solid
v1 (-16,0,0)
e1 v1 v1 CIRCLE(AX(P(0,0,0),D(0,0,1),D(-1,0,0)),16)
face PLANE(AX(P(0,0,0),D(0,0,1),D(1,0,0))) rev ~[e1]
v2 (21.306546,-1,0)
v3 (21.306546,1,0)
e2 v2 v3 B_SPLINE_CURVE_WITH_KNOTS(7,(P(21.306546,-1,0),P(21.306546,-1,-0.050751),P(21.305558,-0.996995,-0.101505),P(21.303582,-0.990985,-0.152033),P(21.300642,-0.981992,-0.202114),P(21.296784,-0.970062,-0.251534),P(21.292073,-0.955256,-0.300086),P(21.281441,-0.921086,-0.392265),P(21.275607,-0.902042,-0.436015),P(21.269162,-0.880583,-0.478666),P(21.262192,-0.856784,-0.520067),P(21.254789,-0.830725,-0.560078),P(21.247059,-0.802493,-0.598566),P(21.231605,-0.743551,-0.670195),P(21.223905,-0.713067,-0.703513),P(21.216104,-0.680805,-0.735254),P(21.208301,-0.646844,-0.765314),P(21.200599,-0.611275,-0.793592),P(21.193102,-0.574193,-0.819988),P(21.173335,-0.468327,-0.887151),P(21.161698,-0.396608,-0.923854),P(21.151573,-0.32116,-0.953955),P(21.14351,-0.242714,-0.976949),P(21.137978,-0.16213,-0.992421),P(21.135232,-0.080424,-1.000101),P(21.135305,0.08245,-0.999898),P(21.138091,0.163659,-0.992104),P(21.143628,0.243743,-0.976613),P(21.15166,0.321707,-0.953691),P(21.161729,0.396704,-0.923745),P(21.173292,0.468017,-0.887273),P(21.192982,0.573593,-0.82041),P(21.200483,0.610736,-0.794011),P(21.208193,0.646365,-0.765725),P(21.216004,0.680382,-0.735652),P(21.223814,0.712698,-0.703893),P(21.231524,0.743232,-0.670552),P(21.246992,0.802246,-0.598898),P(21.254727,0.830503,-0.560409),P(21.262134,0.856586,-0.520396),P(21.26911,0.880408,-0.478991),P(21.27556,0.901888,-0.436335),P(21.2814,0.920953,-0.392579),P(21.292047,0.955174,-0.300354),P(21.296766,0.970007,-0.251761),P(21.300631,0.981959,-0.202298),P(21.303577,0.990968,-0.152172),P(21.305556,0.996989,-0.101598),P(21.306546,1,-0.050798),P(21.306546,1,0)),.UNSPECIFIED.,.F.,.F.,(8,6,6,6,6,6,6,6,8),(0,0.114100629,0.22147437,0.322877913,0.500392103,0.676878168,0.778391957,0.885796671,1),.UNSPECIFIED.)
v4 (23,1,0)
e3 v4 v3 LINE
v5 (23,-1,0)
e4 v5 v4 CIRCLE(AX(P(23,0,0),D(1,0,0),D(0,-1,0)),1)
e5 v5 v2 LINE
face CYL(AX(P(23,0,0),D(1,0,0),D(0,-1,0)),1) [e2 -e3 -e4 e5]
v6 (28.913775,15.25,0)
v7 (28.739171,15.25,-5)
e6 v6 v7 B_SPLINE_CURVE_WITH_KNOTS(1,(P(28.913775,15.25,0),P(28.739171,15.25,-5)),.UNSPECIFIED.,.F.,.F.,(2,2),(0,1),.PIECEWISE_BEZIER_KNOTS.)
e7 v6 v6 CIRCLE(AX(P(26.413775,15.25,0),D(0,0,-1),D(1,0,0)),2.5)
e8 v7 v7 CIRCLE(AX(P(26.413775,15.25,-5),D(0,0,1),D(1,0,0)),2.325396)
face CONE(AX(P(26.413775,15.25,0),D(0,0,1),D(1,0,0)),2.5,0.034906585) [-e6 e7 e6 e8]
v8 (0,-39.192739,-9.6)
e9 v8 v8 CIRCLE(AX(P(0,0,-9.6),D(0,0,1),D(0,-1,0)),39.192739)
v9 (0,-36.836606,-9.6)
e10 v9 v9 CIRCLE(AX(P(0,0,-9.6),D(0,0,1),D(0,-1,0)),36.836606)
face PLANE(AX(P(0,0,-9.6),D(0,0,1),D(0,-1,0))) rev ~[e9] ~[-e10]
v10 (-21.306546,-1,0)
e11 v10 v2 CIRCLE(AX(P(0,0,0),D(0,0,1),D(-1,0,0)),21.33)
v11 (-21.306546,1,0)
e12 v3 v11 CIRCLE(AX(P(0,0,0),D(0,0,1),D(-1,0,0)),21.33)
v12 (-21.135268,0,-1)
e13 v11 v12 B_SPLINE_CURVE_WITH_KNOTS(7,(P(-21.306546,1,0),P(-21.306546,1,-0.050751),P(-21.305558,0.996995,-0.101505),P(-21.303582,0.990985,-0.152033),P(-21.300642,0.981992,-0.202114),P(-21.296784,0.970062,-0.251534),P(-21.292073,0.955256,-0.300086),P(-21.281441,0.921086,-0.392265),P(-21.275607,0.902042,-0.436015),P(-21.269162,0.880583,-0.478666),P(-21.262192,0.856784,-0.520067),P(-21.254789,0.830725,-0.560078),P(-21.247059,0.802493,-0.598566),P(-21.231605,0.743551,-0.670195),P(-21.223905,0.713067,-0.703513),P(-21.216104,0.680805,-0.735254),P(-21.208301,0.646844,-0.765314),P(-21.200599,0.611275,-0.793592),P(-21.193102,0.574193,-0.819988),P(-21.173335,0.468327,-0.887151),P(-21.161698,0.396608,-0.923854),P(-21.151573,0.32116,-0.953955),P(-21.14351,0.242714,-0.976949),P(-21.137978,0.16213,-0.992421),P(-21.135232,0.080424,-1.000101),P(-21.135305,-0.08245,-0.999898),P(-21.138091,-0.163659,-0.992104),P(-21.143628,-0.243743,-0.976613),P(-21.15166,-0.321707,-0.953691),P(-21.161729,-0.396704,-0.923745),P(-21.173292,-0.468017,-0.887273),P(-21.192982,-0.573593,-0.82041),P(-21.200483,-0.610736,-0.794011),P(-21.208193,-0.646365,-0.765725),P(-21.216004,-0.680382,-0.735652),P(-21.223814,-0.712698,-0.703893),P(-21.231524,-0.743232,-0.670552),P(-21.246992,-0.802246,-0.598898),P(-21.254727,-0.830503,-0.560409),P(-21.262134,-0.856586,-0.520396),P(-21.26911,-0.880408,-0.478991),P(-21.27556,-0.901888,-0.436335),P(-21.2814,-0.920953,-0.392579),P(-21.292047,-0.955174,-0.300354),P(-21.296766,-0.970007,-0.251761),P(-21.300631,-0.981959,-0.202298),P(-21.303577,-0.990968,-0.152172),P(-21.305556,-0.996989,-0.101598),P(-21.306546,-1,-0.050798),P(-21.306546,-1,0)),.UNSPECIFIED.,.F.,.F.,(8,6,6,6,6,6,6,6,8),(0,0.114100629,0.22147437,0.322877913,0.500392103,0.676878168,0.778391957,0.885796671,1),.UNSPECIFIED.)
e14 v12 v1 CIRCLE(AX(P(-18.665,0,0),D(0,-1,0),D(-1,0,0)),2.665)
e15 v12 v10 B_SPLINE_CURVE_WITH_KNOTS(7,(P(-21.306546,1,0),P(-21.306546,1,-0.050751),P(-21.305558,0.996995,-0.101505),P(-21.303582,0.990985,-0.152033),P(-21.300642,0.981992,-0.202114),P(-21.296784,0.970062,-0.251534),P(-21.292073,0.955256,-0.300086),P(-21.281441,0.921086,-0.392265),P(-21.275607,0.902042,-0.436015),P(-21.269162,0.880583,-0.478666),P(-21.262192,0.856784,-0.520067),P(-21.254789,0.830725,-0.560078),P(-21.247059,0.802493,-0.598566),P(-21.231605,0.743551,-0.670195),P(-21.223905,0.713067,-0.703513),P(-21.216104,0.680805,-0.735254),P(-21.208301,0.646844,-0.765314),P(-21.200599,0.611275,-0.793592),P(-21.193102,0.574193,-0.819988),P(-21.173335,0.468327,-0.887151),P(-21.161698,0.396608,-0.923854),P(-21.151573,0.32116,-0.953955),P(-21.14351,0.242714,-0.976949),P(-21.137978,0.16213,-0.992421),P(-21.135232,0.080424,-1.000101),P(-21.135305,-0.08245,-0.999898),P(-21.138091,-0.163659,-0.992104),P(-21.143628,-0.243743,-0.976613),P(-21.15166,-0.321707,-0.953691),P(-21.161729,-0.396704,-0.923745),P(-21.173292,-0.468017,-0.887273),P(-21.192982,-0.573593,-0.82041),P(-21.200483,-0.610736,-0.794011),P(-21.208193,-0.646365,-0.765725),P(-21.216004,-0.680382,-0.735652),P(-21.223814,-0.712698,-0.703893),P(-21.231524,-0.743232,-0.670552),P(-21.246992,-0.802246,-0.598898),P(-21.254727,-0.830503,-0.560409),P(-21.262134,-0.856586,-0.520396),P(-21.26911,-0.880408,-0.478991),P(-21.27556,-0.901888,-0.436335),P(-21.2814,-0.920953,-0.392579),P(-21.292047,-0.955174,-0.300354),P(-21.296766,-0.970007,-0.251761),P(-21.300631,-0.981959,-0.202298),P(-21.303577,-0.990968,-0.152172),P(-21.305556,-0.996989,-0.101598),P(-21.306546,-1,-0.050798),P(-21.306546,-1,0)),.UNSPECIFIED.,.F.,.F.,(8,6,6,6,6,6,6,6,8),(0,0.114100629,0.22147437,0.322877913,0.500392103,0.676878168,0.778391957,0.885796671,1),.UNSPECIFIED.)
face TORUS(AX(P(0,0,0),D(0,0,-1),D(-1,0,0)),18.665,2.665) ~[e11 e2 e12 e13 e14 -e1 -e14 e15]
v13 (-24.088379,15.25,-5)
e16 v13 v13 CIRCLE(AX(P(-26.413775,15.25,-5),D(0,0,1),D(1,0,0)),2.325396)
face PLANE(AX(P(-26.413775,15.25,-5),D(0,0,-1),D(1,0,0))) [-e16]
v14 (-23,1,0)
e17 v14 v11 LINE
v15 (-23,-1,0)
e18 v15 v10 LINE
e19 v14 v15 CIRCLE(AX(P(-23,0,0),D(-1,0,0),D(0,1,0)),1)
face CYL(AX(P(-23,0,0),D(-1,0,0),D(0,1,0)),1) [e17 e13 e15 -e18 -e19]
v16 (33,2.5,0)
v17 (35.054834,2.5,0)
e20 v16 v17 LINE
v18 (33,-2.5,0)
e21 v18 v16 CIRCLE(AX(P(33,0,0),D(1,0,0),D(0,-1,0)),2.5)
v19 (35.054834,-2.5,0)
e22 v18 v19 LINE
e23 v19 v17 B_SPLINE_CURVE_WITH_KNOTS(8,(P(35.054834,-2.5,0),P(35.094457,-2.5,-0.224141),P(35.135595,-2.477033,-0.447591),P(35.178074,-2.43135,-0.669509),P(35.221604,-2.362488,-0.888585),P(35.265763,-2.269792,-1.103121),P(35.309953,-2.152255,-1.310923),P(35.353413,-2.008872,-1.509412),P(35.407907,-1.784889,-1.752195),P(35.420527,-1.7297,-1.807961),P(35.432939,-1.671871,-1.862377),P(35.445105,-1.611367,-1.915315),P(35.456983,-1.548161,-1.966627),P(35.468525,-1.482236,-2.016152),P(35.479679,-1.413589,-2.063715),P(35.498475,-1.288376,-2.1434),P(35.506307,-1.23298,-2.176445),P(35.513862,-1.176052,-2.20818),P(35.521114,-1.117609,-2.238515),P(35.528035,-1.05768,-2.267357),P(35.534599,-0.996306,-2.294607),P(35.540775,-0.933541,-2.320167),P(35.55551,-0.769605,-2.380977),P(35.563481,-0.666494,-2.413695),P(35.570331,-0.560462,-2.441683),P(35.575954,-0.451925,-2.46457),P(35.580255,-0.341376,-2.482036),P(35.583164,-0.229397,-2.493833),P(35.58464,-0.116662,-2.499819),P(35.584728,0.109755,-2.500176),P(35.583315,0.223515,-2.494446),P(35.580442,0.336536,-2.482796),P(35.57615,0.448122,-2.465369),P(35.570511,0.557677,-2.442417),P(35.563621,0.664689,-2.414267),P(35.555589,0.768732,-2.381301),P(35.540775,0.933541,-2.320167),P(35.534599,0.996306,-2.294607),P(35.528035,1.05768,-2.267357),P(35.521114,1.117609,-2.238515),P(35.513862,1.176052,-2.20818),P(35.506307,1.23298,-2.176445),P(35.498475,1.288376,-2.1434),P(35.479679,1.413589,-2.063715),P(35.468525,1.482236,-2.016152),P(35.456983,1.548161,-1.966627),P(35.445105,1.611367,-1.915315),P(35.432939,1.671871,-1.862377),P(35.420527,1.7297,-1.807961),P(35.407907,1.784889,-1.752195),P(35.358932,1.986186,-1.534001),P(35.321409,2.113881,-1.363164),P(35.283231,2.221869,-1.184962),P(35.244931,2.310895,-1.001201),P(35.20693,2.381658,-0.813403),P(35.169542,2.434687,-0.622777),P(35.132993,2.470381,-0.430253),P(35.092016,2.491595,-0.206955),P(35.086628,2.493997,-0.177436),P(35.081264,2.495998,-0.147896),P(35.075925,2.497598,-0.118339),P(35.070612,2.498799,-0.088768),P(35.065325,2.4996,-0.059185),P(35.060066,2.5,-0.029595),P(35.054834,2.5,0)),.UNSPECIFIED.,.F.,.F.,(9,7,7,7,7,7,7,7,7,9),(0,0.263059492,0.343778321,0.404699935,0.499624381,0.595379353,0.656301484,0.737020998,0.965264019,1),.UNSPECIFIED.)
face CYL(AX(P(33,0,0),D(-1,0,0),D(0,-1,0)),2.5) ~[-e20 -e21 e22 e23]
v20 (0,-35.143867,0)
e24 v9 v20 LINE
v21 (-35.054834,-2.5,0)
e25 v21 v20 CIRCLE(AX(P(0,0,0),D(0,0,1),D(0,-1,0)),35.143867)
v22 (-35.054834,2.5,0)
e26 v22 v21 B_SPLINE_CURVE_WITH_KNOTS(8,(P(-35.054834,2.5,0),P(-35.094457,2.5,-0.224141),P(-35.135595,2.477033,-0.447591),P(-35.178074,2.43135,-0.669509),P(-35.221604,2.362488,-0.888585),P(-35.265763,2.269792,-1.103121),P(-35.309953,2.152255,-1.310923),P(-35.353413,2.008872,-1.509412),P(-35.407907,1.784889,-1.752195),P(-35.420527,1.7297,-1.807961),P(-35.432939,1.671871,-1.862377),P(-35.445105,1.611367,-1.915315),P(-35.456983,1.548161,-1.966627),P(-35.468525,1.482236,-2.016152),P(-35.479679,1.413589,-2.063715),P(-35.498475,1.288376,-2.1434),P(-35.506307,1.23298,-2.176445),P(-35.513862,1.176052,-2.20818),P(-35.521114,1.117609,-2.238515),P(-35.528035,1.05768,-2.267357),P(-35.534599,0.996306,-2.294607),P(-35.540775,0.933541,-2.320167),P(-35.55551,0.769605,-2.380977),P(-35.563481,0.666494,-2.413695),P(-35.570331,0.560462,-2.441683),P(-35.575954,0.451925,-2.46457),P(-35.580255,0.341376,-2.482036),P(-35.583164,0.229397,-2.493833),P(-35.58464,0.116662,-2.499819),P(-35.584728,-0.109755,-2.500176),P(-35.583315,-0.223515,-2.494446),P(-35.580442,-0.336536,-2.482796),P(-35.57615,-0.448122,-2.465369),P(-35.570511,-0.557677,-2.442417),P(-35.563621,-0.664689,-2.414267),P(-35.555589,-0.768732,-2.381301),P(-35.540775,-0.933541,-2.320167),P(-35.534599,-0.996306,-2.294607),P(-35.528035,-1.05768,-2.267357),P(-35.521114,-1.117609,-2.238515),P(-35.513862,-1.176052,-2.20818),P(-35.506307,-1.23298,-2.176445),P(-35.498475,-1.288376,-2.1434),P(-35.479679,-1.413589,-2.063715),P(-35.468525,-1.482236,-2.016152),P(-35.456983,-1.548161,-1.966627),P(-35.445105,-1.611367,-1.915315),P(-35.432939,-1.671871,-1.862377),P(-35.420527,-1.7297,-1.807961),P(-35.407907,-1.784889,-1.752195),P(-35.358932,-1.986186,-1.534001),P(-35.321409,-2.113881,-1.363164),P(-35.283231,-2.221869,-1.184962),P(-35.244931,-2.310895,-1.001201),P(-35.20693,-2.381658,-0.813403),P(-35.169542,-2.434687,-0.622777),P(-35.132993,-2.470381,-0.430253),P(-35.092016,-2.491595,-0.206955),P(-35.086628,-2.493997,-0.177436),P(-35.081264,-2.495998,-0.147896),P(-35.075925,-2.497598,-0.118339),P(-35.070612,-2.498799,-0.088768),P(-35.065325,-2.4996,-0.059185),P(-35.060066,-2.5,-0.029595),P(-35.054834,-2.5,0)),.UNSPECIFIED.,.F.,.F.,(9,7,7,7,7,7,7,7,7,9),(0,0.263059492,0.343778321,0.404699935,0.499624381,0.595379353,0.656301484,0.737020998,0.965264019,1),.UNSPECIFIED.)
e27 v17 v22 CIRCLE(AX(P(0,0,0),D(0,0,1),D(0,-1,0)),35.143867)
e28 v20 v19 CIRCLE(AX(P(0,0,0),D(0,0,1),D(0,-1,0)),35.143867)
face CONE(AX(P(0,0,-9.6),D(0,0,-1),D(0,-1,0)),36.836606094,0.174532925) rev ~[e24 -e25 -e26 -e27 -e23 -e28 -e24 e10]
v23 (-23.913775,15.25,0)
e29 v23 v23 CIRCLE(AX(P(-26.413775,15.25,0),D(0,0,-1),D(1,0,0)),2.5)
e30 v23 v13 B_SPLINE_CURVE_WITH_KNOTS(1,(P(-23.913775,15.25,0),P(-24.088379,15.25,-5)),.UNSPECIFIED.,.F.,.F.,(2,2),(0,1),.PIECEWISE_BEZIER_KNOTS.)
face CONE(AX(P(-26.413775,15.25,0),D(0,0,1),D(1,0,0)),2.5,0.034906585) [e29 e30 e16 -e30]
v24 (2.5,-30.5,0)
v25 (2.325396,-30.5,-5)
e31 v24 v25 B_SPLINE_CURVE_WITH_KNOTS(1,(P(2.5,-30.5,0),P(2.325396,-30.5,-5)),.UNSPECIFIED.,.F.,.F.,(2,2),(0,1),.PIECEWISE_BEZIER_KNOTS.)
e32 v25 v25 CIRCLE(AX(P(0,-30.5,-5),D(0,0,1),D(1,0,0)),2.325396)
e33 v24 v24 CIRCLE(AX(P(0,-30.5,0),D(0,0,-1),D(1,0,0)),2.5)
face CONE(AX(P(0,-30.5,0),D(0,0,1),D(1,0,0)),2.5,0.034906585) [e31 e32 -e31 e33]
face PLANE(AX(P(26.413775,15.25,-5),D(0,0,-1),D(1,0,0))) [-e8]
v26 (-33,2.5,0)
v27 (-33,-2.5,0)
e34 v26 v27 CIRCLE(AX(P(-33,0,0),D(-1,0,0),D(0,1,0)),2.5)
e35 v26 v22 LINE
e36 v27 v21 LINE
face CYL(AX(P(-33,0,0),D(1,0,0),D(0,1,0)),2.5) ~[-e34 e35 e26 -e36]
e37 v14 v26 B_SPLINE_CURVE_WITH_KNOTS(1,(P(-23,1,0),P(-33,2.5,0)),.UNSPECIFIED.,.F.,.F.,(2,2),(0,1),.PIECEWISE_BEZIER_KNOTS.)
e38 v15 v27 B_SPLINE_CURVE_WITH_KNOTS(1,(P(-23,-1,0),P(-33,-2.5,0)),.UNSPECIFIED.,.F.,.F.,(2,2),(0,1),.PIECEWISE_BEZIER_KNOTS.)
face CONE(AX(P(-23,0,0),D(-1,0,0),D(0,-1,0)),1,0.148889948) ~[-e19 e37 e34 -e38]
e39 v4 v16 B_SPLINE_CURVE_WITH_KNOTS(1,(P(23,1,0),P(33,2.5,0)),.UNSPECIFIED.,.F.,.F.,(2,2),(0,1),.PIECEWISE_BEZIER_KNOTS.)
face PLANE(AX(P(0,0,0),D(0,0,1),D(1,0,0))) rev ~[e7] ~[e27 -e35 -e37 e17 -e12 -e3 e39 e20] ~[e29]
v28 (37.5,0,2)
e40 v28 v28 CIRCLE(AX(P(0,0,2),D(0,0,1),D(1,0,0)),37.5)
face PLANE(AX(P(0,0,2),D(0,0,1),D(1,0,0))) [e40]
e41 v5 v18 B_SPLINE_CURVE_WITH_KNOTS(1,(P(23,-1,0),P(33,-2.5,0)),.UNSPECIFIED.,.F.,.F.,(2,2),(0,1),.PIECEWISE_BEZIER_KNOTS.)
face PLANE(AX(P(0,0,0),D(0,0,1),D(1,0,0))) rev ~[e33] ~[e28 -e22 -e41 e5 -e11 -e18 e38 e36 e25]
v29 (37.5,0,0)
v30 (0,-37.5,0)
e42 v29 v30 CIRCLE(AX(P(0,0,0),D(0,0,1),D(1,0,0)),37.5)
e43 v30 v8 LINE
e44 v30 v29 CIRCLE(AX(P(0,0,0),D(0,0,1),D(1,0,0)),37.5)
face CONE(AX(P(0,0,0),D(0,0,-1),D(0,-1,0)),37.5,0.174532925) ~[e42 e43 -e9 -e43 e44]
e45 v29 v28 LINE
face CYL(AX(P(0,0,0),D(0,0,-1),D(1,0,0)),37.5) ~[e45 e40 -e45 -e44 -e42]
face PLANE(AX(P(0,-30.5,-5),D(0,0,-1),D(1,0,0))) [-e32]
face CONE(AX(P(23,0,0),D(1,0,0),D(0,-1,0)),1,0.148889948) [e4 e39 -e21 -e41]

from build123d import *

# Parameters (mm, degrees)
F3_R             = 37.5
F4_DEPTH         = 2
F7_R             = 2.5
F8_DEPTH         = 5
F8_TAPER         = 2
F12_COPIES_COUNT = 2
F14_COPIES_COUNT = 2


# Not quite as in the source:
# - a pattern or mirror of a feature is missing from the dataset's text; its kind, count and spacing are read off the source's solid


with BuildPart() as f2:
    # F1 (on Front) → F2 (revolve)
    with BuildSketch(Plane.XZ):
        with BuildLine():
            Line((-16, 0), (-21.33, 0))
            ThreePointArc((-21.33, 0), (-18.665, -2.665), (-16, 0))
        make_face()
    revolve(axis=Axis((0, 0, 18.396249041), (0, 0, 1)))

    # F3 (on face) → F4 (join)
    with BuildSketch(Plane.XY):
        Circle(F3_R)
    extrude(amount=F4_DEPTH)

    # F5 (on Right) → F6 (revolve)
    with BuildSketch(Plane.YZ):
        Polygon((-36.8366060944, -9.6), (-35.1438670796, 0), (-37.5, 0), (-39.1927390148, -9.6), align=None)
    revolve(axis=Axis((0, 0, 18.396249041), (0, 0, 1)))

    # F7 (on face) → F8 (join)
    with BuildSketch(Plane(origin=(0, 0, 0), x_dir=(1, 0, 0), z_dir=(0, 0, -1))):
        with Locations((0, 30.5)):
            Circle(F7_R)
        with Locations((-26.4137748154, -15.25)):
            Circle(F7_R)
        with Locations((26.4137748154, -15.25)):
            Circle(F7_R)
    extrude(amount=F8_DEPTH, taper=F8_TAPER)

    # F11 (on offset) → F12 (join, up to the next surface of F2)
    with BuildSketch(Plane.YZ.offset(33)):
        with BuildLine():
            Line((2.5, 0), (-2.5, 0))
            ThreePointArc((-2.5, 0), (0, -2.5), (2.5, 0))
        make_face()
    f12 = extrude(until=Until.NEXT)

    # F12_copies: F12 ×2 about axis
    f12_copies_axis = Axis((0, 0, 0), (0, 0, 1))
    for i in range(1, F12_COPIES_COUNT):
        add(f12.rotate(f12_copies_axis, i * 360 / F12_COPIES_COUNT))

    # F13 (on offset) → F14 (join, up to the next surface of F2)
    with BuildSketch(Plane.YZ.offset(23)):
        with BuildLine():
            Line((1, 0), (-1, 0))
            ThreePointArc((-1, 0), (0, -1), (1, 0))
        make_face()
    f14 = extrude(until=Until.NEXT, dir=(-1, 0, 0))

    # F14_copies: F14 ×2 about axis
    f14_copies_axis = Axis((0, 0, 0), (0, 0, 1))
    for i in range(1, F14_COPIES_COUNT):
        add(f14.rotate(f14_copies_axis, i * 360 / F14_COPIES_COUNT))

    # F14_face (on face) → F15 section 0
    with BuildSketch(Plane(origin=(23, 0, -0.4244131816), x_dir=(0, 1, 0), z_dir=(1, 0, 0))):
        with BuildLine():
            Line((1, 0.4244131816), (-1, 0.4244131816))
            ThreePointArc((-1, 0.4244131816), (0, -0.5755868184), (1, 0.4244131816))
        make_face()
    # F12_face (on face) → F15 section 1
    with BuildSketch(Plane(origin=(33, 0, -1.0610329539), x_dir=(0, 1, 0), z_dir=(-1, 0, 0))):
        with BuildLine():
            Line((-2.5, -1.0610329539), (2.5, -1.0610329539))
            ThreePointArc((2.5, -1.0610329539), (0, 1.4389670461), (-2.5, -1.0610329539))
        make_face()
    f15 = loft()

    # F15_copies: F15 across plane
    add(f15.mirror(Plane(origin=(0, 0, 0), x_dir=(0, 0, -1), z_dir=(-1, 0, 0))))


solid = f2.part
